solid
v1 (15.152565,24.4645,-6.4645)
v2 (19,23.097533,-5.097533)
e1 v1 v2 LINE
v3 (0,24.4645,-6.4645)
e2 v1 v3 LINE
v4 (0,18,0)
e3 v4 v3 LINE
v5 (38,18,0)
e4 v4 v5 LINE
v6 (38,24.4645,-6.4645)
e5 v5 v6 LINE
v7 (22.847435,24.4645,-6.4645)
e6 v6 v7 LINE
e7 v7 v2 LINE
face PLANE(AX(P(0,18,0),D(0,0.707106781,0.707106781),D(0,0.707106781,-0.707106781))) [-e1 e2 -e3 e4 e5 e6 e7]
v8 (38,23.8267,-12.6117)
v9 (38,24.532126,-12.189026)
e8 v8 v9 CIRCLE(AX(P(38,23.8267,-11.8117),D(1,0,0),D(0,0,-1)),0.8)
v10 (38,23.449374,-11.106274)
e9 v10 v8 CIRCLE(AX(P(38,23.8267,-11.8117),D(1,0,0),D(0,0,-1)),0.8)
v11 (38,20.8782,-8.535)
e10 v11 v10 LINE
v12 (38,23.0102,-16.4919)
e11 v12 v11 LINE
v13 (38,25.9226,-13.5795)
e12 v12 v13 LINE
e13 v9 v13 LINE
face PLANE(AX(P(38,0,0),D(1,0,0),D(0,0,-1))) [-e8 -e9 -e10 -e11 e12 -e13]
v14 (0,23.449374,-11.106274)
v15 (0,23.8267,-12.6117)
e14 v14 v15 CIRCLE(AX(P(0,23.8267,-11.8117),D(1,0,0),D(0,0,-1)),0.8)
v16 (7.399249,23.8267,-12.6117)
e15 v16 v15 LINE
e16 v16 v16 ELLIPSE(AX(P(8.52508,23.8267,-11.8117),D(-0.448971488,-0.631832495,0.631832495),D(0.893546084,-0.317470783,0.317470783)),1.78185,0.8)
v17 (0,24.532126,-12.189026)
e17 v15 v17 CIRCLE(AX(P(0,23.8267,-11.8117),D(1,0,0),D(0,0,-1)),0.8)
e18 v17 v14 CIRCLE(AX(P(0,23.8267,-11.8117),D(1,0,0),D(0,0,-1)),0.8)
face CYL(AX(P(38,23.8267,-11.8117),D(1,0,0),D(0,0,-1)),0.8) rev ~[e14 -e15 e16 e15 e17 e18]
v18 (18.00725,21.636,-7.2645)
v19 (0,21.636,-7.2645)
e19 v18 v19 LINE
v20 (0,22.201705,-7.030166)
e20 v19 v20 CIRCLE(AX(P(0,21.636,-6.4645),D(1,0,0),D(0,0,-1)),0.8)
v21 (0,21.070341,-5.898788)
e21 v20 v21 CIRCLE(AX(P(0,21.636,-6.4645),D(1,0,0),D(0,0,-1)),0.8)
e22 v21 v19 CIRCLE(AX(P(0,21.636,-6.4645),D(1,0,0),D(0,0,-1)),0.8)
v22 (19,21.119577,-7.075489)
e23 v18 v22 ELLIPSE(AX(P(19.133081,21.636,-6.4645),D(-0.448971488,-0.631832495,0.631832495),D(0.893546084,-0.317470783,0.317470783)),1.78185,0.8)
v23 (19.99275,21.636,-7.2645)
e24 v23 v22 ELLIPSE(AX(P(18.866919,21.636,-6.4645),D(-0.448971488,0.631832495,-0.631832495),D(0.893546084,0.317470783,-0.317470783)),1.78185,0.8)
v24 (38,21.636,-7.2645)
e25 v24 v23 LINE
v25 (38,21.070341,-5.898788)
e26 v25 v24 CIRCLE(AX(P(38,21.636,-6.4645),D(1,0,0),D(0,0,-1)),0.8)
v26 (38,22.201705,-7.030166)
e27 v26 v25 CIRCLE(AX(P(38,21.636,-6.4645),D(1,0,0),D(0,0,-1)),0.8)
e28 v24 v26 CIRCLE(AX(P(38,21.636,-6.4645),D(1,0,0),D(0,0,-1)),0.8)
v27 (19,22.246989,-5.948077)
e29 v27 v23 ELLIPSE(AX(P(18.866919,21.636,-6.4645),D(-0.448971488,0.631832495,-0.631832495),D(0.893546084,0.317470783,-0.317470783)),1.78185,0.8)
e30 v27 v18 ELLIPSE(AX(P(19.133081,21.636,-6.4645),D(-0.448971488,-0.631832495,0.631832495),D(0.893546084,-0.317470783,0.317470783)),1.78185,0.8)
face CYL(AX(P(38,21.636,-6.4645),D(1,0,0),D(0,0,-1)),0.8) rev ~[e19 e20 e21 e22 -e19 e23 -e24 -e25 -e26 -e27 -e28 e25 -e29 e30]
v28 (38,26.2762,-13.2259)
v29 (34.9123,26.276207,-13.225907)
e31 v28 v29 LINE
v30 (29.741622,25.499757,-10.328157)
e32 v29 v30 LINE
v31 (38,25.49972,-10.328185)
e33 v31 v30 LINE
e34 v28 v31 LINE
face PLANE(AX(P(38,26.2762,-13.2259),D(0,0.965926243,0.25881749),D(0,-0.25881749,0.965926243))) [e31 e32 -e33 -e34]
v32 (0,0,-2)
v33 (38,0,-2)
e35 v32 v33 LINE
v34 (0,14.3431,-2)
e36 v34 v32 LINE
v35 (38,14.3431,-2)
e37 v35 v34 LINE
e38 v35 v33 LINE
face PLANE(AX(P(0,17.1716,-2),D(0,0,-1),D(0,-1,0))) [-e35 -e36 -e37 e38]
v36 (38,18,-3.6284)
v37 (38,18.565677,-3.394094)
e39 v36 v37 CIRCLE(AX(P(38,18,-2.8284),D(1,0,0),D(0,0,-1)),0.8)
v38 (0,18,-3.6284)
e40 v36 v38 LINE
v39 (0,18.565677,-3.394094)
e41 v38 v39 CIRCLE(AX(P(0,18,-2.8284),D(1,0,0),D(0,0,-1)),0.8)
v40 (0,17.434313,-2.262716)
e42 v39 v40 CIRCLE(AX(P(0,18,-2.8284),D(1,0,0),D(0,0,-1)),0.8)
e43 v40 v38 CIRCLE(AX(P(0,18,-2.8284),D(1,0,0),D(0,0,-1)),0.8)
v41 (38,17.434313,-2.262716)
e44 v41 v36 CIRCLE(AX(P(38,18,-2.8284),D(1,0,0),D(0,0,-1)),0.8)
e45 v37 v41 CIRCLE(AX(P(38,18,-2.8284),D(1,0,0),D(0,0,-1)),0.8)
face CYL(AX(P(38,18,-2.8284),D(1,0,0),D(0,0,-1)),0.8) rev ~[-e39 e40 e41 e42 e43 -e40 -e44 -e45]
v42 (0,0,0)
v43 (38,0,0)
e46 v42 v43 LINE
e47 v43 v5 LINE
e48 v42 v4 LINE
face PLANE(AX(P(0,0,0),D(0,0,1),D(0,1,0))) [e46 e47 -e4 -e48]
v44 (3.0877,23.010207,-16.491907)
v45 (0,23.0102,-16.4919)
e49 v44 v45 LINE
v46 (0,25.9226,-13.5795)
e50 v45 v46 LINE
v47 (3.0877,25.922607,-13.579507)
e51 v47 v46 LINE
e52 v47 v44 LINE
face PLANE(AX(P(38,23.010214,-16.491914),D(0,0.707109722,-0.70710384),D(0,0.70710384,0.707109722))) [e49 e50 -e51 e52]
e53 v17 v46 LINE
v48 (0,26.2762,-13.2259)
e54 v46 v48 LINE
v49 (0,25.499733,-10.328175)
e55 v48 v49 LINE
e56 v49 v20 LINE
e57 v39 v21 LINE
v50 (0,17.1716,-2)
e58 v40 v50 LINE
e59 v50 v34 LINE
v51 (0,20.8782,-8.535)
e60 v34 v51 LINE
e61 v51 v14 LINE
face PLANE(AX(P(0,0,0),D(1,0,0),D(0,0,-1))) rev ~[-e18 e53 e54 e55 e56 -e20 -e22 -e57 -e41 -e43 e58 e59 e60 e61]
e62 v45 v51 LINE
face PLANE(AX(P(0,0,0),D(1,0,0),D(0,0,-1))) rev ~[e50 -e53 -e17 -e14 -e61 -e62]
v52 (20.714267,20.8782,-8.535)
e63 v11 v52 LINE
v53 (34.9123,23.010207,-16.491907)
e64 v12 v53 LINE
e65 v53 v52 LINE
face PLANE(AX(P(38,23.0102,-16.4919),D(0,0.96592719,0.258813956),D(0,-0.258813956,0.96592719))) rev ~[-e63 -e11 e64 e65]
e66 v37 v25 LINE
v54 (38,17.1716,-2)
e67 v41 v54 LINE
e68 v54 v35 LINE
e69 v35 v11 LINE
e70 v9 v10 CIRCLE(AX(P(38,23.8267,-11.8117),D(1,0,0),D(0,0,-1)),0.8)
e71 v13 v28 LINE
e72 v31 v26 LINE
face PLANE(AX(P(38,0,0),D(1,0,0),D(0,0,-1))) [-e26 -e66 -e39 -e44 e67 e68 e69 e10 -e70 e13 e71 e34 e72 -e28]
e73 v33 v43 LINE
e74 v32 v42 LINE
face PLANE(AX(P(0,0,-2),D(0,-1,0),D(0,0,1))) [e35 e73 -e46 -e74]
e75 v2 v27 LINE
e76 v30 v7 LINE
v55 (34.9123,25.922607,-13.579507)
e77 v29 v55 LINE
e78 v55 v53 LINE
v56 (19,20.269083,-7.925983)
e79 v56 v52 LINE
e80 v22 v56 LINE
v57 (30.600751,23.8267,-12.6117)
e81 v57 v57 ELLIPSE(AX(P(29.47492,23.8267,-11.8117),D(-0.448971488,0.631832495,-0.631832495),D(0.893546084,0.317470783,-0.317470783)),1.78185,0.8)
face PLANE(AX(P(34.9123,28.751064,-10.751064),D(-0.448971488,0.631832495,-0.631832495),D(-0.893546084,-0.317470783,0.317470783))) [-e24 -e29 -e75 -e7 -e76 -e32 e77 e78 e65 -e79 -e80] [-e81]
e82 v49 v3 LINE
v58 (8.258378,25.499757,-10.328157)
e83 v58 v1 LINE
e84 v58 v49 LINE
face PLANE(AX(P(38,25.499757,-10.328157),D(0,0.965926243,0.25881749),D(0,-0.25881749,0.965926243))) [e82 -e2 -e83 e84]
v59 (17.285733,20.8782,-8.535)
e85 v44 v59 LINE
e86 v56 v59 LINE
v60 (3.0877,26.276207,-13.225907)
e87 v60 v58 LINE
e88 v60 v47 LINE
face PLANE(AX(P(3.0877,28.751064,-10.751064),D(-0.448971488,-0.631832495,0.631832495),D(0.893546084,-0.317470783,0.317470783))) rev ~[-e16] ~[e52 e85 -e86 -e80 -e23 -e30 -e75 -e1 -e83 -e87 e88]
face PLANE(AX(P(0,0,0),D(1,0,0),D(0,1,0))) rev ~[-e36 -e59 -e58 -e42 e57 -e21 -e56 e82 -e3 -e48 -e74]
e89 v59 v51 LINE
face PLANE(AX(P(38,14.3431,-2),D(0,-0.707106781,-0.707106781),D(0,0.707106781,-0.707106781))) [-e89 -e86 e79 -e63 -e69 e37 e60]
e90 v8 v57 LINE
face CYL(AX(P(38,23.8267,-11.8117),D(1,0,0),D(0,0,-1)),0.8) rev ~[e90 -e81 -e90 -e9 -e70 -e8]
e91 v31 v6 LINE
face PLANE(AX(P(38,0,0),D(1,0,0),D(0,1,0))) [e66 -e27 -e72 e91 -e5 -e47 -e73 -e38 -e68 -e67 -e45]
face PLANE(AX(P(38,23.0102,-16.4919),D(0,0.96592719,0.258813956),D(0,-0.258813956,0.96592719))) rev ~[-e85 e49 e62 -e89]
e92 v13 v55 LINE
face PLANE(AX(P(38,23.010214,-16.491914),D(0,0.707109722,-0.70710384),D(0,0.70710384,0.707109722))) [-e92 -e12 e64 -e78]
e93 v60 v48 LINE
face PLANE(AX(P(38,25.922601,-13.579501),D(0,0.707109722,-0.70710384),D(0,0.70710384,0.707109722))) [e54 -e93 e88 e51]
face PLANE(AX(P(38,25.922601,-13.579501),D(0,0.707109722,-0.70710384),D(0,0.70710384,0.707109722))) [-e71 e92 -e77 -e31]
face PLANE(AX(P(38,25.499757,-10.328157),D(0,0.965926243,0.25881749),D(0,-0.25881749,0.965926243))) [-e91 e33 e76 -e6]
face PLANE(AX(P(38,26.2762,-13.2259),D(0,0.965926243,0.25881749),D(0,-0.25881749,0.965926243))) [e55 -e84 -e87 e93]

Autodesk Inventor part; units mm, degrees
ref_plane "YZ Plane" through (0, 0, 0) normal (1, 0, 0) x (0, 1, 0)
ref_plane "XZ Plane" through (0, 0, 0) normal (0, 1, 0) x (-1, 0, 0)
sketch "スケッチ1" plane through (0, 0, 0) normal (1, 0, 0) x (0, 1, 0)
  line L0 (0, 0) -> (18, 0)
  line L1 (18, 0) -> (18, -2)
  line L2 (18, -2) -> (0, -2)
  line L3 (0, -2) -> (0, 0)
  line L4 (18, 0) -> (39.2132, -21.2132)
  line L5 (39.2132, -21.2132) -> (37.799, -22.6274)
  line L6 (37.799, -22.6274) -> (17.1716, -2)
  dimension "d0" = 2
  dimension "d1" = 18
  dimension "d4" = 30
  dimension "d5" = 135
  dimension "d6" = 2
extrude "押し出し1" add sketch "スケッチ1" along normal blind 38
sketch "スケッチ2" plane through (38, 0, 0) normal (1, 0, 0) x (0, 0, -1)
  line L0 (13.2259, 26.2762) -> (6.4645, 24.4645) projected
  line L1 (2, 0) -> (2, 17.1716) projected
  line L2 (2, 17.1716) -> (22.6274, 37.799) projected
  line L3 (22.6274, 37.799) -> (21.2132, 39.2132) projected
  line L4 (21.2132, 39.2132) -> (0, 18) projected
  line L5 (0, 18) -> (0, 0) projected
  line L6 (0, 0) -> (2, 0) projected
  point P0 (10.3282, 25.4997)
extrude "押し出し2" cut sketch "スケッチ2" against normal through all contours L0 L4 L3 L2
sketch "スケッチ3" plane through (38, 0, 0) normal (1, 0, 0) x (0, 0, -1)
  line L0 (0, -0.1838) -> (49.5981, -49.7818) projected
  line L1 (49.5981, -49.7818) -> (50.9877, -48.3922) projected
  line L2 (50.9877, -48.3922) -> (50.3051, -40.5894) projected
  line L3 (50.3051, -40.5894) -> (38.2775, -28.5617) projected
  line L4 (38.2775, -28.5617) -> (34.3952, -14.0729) projected
  line L5 (34.3952, -14.0729) -> (39.6985, -8.7696) projected
  line L6 (25.2028, 5.7261) -> (39.6985, -8.7696) projected
  line L7 (25.2028, 9.9688) -> (25.2468, 10.0127) projected
  line L8 (25.2468, 14.2554) -> (13.2259, 26.2762) projected
  line L9 (13.2259, 26.2762) -> (6.4645, 24.4645) projected
  line L10 (6.4645, 24.4645) -> (0, 18) projected
  circle A0 centre (45.0018, -38.8216) radius 0.8 projected
  circle A1 centre (48.5373, -42.3571) radius 0.8 projected
  line L11 (25.2886, 2.8119) -> (28.6525, -0.552) projected
  arc A2 (29.0919, -1.6127) -> (28.6525, -0.552) centre (27.5919, -1.6127) ccw projected
  line L12 (29.0919, -1.6127) -> (29.0919, -20.7046) projected
  arc A3 (26.5312, -21.7652) -> (29.0919, -20.7046) centre (27.5919, -20.7046) ccw projected
  line L13 (26.5312, -21.7652) -> (23.1673, -18.4013) projected
  arc A4 (22.7279, -17.3406) -> (23.1673, -18.4013) centre (24.2279, -17.3406) ccw projected
  line L14 (22.7279, -17.3406) -> (22.7279, 1.7513) projected
  arc A5 (25.2886, 2.8119) -> (22.7279, 1.7513) centre (24.2279, 1.7513) ccw projected
  line L15 (13.8033, -9.0373) -> (10.4393, -5.6734) projected
  arc A6 (10, -4.6127) -> (10.4393, -5.6734) centre (11.5, -4.6127) ccw projected
  line L16 (10, -4.6127) -> (10, 14.4792) projected
  arc A7 (12.5607, 15.5398) -> (10, 14.4792) centre (11.5, 14.4792) ccw projected
  line L17 (12.5607, 15.5398) -> (15.9246, 12.1759) projected
  arc A8 (16.364, 11.1152) -> (15.9246, 12.1759) centre (14.864, 11.1152) ccw projected
  line L18 (16.364, 11.1152) -> (16.364, -7.9767) projected
  arc A9 (13.8033, -9.0373) -> (16.364, -7.9767) centre (14.864, -7.9767) ccw projected
  line L19 (2, 0) -> (2, 17.1716) projected
  line L20 (2, 14.3431) -> (13.5795, 25.9226)
  line L21 (16.4919, 23.0102) -> (8.535, 20.8782)
  line L22 (6.4645, 24.4645) -> (0, 18) projected
  line L23 (2, 17.1716) -> (10.3282, 25.4997) projected
  circle A10 centre (11.8117, 23.8267) radius 0.8 projected
  circle A11 centre (2.8284, 18) radius 0.8 projected
  circle A12 centre (6.4645, 21.636) radius 0.8 projected
  arc A13 (25.2028, 9.9688) -> (25.2028, 5.7261) centre (27.3241, 7.8475) ccw projected
  circle A14 centre (16.7615, 19.9122) radius 0.8 projected
  line L24 (0, 18) -> (0, -0.1838) projected
  arc A15 (25.2468, 10.0127) -> (25.2468, 14.2554) centre (23.1254, 12.1341) ccw projected
  circle A16 centre (20.297, 16.3767) radius 0.8 projected
  point P0 (0, 0)
  dimension "d9" = 4
  dimension "d10" = 4
ref_plane "作業平面1" through (0, -49.7818, -69.441) normal (1, 0, 0) x (0, 0.7071068, -0.7071068)
extrude "押し出し3" add sketch "スケッチ3" against normal up to surface (38 mm away) contours L9 L8 L20 A10 L19 L23 A11 A12 | A12 L23 | L8 L21 L20 A10 | A10 L20 | L20 A10 | A11 L23 picked at (6.7643, 21.5956) picked at (2.746, 17.7464)
sketch "スケッチ4" plane through (38, 0, 0) normal (1, 0, 0) x (0, 0, -1)
  circle A0 centre (2.8284, 18) radius 0.8
  circle A1 centre (6.4645, 21.636) radius 0.8
  circle A2 centre (11.8117, 23.8267) radius 0.8
  line L0 (6.4645, 24.4645) -> (0, 18) projected
  line L1 (13.2259, 26.2762) -> (6.4645, 24.4645) projected
  line L2 (11.8117, 23.8267) -> (11.2941, 25.7586)
  point P0 (0, 0)
  dimension "d13" = 1.6
  dimension "d14" = 2
  dimension "d15" = 2
  dimension "d16" = 2
  dimension "d17" = 2
extrude "押し出し4" cut sketch "スケッチ4" against normal through all
sketch "スケッチ5" plane through (0, 18, 0) normal (0, 0.7071068, 0.7071068) x (1, 0, 0)
  line L0 (19, 8.3282) -> (1.5, 17.1212) projected
  line L1 (36.5, 17.1212) -> (19, 8.3282) projected
  line L2 (38, 15.2043) -> (0, 15.2043) projected
  line L3 (3.0877, 15.2043) -> (19, 7.209)
  line L4 (38, 15.2043) -> (0, 15.2043) projected
  line L5 (34.9123, 15.2043) -> (19, 7.209)
  point P0 (0, -12.7279)
  dimension "d20" = 1
extrude "押し出し5" cut sketch "スケッチ5" against normal through all
equation "\"d15\" = d14"
properties part number "upper"
